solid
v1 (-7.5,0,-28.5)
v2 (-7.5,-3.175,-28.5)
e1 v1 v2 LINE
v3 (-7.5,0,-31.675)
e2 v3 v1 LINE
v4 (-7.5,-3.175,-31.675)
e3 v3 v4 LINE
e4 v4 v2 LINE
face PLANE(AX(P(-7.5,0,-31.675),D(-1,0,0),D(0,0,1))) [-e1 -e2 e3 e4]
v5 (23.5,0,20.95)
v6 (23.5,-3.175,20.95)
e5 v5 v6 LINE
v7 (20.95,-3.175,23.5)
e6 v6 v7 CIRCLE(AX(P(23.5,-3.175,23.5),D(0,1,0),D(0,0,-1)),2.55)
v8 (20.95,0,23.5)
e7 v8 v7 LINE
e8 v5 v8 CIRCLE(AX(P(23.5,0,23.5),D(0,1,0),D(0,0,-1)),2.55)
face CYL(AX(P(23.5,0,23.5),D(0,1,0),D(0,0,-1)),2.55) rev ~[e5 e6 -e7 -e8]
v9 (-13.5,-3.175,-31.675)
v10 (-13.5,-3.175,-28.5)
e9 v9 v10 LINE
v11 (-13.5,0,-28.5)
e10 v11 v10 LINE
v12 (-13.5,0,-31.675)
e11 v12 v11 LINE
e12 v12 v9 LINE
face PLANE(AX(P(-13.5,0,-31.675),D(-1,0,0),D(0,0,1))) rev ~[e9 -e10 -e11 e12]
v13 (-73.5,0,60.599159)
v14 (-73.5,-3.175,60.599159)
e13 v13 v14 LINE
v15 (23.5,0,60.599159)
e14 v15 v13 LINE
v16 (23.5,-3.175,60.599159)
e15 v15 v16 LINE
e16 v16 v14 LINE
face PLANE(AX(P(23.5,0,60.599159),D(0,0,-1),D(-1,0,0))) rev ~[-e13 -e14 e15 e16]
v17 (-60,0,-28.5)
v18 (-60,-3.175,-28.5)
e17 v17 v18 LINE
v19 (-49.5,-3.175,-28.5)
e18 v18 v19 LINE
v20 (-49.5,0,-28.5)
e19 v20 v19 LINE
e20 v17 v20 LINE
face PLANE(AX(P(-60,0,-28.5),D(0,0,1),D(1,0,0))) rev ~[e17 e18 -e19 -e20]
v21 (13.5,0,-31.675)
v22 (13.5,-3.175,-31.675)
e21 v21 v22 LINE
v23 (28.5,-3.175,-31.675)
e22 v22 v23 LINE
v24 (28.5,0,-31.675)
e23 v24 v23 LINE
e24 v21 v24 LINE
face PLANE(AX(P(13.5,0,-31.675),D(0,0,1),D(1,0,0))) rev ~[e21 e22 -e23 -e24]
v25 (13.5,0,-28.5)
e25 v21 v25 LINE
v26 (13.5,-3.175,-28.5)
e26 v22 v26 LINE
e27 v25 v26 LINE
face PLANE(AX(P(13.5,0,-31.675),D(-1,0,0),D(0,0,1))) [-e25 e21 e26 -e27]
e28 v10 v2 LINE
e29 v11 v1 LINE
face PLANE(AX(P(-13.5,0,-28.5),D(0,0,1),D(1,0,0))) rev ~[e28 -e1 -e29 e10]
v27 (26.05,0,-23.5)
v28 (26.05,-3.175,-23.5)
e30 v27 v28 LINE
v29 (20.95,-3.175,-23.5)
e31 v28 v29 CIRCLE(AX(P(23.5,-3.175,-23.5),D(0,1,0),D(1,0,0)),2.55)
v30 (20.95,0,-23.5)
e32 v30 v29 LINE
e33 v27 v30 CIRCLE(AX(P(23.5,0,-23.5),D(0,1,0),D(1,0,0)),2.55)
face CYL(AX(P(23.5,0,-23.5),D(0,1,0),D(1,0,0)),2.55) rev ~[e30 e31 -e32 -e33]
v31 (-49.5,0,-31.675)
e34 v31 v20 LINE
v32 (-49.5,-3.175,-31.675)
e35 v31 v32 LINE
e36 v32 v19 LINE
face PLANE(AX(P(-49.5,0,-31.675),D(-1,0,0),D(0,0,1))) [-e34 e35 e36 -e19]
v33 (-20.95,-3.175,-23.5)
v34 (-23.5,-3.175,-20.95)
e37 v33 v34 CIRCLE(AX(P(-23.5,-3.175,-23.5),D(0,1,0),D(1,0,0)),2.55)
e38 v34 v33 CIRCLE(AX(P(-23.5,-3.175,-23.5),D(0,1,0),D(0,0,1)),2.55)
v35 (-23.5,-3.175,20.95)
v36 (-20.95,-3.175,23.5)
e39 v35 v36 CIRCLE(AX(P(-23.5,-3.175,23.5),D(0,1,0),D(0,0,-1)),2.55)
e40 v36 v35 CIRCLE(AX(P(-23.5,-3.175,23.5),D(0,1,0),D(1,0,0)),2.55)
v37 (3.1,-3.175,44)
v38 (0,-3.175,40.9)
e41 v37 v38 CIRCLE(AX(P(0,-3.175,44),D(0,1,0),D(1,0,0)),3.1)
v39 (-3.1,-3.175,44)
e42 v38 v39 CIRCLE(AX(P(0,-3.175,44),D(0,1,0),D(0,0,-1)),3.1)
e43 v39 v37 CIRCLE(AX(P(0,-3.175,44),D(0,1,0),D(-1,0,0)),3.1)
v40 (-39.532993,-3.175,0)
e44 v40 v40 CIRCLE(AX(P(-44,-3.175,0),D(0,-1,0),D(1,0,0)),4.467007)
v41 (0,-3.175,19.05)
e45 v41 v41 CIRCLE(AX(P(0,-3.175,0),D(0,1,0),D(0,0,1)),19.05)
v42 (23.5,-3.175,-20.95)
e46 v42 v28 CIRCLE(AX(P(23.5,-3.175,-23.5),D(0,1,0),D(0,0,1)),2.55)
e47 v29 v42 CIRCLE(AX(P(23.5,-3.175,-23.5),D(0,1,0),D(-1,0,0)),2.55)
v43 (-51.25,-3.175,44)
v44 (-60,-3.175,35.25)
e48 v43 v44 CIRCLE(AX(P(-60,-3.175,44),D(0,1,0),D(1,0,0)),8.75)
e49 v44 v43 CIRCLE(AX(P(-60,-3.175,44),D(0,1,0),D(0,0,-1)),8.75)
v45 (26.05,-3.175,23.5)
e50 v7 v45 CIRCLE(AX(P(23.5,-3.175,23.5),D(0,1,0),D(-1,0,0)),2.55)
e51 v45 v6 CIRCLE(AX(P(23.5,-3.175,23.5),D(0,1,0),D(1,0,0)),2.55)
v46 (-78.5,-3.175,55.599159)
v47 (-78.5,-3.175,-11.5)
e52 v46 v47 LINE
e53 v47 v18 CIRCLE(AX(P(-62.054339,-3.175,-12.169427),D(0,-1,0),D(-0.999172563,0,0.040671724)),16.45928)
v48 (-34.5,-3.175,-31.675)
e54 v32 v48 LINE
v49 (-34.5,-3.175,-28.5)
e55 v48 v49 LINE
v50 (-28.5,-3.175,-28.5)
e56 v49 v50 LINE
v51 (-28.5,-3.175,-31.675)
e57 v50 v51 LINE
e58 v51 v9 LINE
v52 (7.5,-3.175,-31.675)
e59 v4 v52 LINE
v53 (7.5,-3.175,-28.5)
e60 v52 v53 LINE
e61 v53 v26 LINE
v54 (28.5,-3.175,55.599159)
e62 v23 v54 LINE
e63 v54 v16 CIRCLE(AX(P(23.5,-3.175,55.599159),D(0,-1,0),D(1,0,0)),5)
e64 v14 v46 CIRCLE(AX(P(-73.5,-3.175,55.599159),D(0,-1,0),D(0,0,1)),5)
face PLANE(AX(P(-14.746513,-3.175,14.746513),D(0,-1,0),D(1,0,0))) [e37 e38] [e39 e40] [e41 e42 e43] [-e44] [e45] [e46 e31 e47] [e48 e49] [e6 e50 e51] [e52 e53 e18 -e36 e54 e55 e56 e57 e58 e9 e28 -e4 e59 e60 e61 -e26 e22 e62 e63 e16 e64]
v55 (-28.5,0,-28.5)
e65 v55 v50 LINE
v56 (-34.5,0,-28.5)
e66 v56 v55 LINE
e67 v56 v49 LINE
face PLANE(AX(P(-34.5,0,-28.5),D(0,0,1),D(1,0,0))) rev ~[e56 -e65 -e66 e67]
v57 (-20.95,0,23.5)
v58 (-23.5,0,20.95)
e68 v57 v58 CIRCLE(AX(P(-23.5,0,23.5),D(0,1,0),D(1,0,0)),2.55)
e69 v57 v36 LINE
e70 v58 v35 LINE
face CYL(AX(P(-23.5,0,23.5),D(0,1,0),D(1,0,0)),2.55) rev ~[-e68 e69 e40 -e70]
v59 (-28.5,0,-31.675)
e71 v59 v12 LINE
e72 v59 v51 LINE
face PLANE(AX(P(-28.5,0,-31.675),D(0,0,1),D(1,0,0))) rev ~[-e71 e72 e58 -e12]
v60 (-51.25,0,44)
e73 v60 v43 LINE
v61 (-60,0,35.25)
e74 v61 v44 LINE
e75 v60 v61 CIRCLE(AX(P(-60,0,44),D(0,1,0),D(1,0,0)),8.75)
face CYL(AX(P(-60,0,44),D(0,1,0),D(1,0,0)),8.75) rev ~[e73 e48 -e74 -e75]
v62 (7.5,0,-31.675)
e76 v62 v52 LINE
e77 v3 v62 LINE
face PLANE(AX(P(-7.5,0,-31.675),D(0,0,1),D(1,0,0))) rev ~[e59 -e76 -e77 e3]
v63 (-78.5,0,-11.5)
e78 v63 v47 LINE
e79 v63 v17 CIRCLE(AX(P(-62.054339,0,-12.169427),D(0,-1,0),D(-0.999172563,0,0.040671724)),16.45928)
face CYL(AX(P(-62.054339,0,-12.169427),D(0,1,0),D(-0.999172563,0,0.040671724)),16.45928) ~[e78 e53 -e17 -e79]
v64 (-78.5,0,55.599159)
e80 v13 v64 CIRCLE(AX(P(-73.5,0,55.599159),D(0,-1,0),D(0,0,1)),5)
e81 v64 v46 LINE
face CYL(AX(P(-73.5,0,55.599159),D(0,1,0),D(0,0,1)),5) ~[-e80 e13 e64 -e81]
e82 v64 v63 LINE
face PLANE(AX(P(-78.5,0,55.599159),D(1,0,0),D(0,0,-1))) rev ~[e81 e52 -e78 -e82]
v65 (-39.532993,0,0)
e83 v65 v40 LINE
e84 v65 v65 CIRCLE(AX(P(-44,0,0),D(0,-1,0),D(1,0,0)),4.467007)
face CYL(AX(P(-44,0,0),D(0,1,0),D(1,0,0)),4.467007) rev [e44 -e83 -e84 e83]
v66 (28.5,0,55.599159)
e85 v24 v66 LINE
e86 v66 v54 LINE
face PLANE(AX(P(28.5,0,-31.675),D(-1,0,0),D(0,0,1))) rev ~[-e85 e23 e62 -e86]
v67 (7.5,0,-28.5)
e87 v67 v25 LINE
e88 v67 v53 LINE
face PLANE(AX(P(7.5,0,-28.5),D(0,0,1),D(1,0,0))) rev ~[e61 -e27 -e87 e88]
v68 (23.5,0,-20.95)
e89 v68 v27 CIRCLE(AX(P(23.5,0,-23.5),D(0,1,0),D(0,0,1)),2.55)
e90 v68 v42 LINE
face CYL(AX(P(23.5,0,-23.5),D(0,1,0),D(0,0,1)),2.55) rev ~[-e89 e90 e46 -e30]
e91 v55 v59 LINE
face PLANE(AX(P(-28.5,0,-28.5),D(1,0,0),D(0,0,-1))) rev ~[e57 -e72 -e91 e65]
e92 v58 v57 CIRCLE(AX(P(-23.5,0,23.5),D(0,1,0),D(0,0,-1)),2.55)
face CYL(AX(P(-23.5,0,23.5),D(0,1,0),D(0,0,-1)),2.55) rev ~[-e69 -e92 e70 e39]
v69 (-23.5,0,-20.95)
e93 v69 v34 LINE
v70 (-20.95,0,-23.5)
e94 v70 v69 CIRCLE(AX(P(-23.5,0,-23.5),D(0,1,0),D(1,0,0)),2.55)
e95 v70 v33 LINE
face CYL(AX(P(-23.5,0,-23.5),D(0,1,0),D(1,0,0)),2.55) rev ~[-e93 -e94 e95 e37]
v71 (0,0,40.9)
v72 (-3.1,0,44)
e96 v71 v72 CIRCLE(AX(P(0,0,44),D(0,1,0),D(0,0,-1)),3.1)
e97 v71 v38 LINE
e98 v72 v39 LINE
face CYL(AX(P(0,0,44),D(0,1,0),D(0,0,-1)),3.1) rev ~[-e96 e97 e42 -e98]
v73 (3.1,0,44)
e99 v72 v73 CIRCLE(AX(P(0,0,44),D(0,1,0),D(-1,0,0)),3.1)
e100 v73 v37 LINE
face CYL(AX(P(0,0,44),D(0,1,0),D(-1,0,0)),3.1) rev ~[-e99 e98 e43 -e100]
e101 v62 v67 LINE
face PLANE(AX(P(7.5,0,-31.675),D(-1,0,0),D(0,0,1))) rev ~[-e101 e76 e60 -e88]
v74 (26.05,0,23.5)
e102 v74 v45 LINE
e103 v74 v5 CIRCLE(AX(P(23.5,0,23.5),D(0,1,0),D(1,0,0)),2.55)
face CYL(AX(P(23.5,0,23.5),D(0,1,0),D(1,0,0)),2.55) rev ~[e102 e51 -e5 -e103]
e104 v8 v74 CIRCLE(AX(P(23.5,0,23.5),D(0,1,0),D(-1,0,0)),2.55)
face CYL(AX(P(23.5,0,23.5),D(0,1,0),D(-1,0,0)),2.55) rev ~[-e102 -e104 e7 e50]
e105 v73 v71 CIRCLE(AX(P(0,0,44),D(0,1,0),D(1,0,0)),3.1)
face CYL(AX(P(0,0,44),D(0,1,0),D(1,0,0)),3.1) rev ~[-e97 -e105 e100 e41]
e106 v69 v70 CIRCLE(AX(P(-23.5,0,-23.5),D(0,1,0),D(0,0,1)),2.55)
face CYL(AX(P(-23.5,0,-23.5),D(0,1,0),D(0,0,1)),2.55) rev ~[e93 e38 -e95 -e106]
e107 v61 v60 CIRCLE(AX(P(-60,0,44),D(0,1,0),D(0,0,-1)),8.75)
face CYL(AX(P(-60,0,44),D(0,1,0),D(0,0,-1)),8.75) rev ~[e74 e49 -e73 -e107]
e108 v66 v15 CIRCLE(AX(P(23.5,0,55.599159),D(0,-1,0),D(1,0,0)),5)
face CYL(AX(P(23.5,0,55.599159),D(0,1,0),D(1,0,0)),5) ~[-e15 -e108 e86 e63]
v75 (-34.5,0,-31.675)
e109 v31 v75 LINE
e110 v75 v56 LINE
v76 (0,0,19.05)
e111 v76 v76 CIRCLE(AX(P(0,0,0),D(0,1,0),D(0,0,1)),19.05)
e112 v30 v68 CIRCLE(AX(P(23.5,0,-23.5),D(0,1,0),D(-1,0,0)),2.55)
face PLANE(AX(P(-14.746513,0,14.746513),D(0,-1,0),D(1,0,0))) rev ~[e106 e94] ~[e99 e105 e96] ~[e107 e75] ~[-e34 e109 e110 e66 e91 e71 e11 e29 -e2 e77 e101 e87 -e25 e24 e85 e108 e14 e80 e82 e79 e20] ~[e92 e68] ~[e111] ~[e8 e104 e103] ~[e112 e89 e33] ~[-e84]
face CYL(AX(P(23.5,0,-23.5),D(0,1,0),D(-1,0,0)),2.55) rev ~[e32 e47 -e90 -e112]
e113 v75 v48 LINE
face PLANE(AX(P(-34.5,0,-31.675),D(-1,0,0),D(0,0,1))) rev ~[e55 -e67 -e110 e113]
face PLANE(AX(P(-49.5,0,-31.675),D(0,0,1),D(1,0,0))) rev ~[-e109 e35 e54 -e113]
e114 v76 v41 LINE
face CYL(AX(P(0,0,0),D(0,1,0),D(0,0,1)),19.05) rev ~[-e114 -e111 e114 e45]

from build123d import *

# Parameters (mm, degrees)
F0_W     = 15
F0_H     = 3.175
F0_W_2   = 7.5
F0_R     = 4.4670073426
F1_DEPTH = 3.175


# Not quite as in the source:
# - a feature names something its author has since deleted; it is built from what else it names


with BuildPart() as f1:
    # F0 (on Front) → F1 (new body)
    with BuildSketch(Plane.XZ):
        with BuildLine():
            Line((0, 19.05), (0, 23.5))
            Line((0, 23.5), (-20.95, 23.5))
            ThreePointArc((-20.95, 23.5), (-21.696877708, 21.696877708), (-23.5, 20.95))
            Line((-23.5, 20.95), (-23.5, 0))
            Line((-23.5, 0), (-19.05, 0))
            ThreePointArc((-19.05, 0), (-13.4703841816, 13.4703841816), (0, 19.05))
        make_face()
        with BuildLine():
            Line((20.95, 23.5), (0, 23.5))
            Line((0, 23.5), (0, 19.05))
            ThreePointArc((0, 19.05), (13.4703841816, 13.4703841816), (19.05, 0))
            ThreePointArc((19.05, 0), (0, -19.05), (-19.05, 0))
            Line((-19.05, 0), (-23.5, 0))
            Line((-23.5, 0), (-23.5, -20.95))
            ThreePointArc((-23.5, -20.95), (-21.696877708, -21.696877708), (-20.95, -23.5))
            Line((-20.95, -23.5), (20.95, -23.5))
            ThreePointArc((20.95, -23.5), (21.696877708, -21.696877708), (23.5, -20.95))
            Line((23.5, -20.95), (23.5, 20.95))
            ThreePointArc((23.5, 20.95), (21.696877708, 21.696877708), (20.95, 23.5))
        make_face()
        with Locations((21, -30.0875)):
            Rectangle(F0_W, F0_H)
        with Locations((3.75, -30.0875)):
            Rectangle(F0_W_2, F0_H)
        with Locations((-3.75, -30.0875)):
            Rectangle(F0_W_2, F0_H)
        with Locations((-21, -30.0875)):
            Rectangle(F0_W, F0_H)
        with BuildLine():
            Line((0, 28.5), (-28.5, 28.5))
            Line((-28.5, 28.5), (-28.5, 0))
            Line((-28.5, 0), (-23.5, 0))
            Line((-23.5, 0), (-23.5, 20.95))
            ThreePointArc((-23.5, 20.95), (-25.303122292, 25.303122292), (-20.95, 23.5))
            Line((-20.95, 23.5), (0, 23.5))
            Line((0, 23.5), (0, 28.5))
        make_face()
        with BuildLine():
            Line((23.5, 28.5), (0, 28.5))
            Line((0, 28.5), (0, 23.5))
            Line((0, 23.5), (20.95, 23.5))
            ThreePointArc((20.95, 23.5), (23.5, 26.05), (26.05, 23.5))
            ThreePointArc((26.05, 23.5), (25.303122292, 21.696877708), (23.5, 20.95))
            Line((23.5, 20.95), (23.5, -20.95))
            ThreePointArc((23.5, -20.95), (25.303122292, -21.696877708), (26.05, -23.5))
            ThreePointArc((26.05, -23.5), (23.5, -26.05), (20.95, -23.5))
            Line((20.95, -23.5), (-20.95, -23.5))
            ThreePointArc((-20.95, -23.5), (-25.303122292, -25.303122292), (-23.5, -20.95))
            Line((-23.5, -20.95), (-23.5, 0))
            Line((-23.5, 0), (-28.5, 0))
            Line((-28.5, 0), (-28.5, -28.5))
            Line((-28.5, -28.5), (-13.5, -28.5))
            Line((-13.5, -28.5), (-7.5, -28.5))
            Line((-7.5, -28.5), (0, -28.5))
            Line((0, -28.5), (7.5, -28.5))
            Line((7.5, -28.5), (13.5, -28.5))
            Line((13.5, -28.5), (28.5, -28.5))
            Line((28.5, -28.5), (28.5, 23.5))
            Line((28.5, 23.5), (28.5, 28.5))
            Line((28.5, 28.5), (23.5, 28.5))
        make_face()
        with BuildLine():
            Line((-51.25, 44), (-28.5, 44))
            Line((-28.5, 44), (-28.5, 60.5991594493))
            Line((-28.5, 60.5991594493), (-73.5, 60.5991594493))
            ThreePointArc((-73.5, 60.5991594493), (-77.0355339059, 59.1346933553), (-78.5, 55.5991594493))
            Line((-78.5, 55.5991594493), (-78.5, -11.5))
            ThreePointArc((-78.5, -11.5), (-73.1911039749, -24.2888484433), (-60, -28.5))
            Line((-60, -28.5), (-60, 35.25))
            ThreePointArc((-60, 35.25), (-66.1871843354, 50.1871843354), (-51.25, 44))
        make_face()
        with BuildLine():
            Line((-28.5, 0), (-28.5, 28.5))
            Line((-28.5, 28.5), (-28.5, 44))
            Line((-28.5, 44), (-51.25, 44))
            ThreePointArc((-51.25, 44), (-53.8128156646, 37.8128156646), (-60, 35.25))
            Line((-60, 35.25), (-60, -28.5))
            Line((-60, -28.5), (-49.5, -28.5))
            Line((-49.5, -28.5), (-34.5, -28.5))
            Line((-34.5, -28.5), (-28.5, -28.5))
            Line((-28.5, -28.5), (-28.5, 0))
        make_face()
        with Locations((-44, 0)):
            Circle(F0_R, mode=Mode.SUBTRACT)
        with Locations((-42, -30.0875)):
            Rectangle(F0_W, F0_H)
        with BuildLine():
            Line((-28.5, 44), (-28.5, 28.5))
            Line((-28.5, 28.5), (0, 28.5))
            Line((0, 28.5), (0, 40.9))
            ThreePointArc((0, 40.9), (-2.1920310217, 41.8079689783), (-3.1, 44))
            Line((-3.1, 44), (-28.5, 44))
        make_face()
        with BuildLine():
            Line((0, 40.9), (0, 28.5))
            Line((0, 28.5), (23.5, 28.5))
            Line((23.5, 28.5), (28.5, 28.5))
            Line((28.5, 28.5), (28.5, 55.5991594493))
            ThreePointArc((28.5, 55.5991594493), (27.0355339059, 59.1346933553), (23.5, 60.5991594493))
            Line((23.5, 60.5991594493), (-28.5, 60.5991594493))
            Line((-28.5, 60.5991594493), (-28.5, 44))
            Line((-28.5, 44), (-3.1, 44))
            ThreePointArc((-3.1, 44), (0, 47.1), (3.1, 44))
            ThreePointArc((3.1, 44), (2.1920310217, 41.8079689783), (0, 40.9))
        make_face()
    extrude(amount=F1_DEPTH)


solid = f1.part
